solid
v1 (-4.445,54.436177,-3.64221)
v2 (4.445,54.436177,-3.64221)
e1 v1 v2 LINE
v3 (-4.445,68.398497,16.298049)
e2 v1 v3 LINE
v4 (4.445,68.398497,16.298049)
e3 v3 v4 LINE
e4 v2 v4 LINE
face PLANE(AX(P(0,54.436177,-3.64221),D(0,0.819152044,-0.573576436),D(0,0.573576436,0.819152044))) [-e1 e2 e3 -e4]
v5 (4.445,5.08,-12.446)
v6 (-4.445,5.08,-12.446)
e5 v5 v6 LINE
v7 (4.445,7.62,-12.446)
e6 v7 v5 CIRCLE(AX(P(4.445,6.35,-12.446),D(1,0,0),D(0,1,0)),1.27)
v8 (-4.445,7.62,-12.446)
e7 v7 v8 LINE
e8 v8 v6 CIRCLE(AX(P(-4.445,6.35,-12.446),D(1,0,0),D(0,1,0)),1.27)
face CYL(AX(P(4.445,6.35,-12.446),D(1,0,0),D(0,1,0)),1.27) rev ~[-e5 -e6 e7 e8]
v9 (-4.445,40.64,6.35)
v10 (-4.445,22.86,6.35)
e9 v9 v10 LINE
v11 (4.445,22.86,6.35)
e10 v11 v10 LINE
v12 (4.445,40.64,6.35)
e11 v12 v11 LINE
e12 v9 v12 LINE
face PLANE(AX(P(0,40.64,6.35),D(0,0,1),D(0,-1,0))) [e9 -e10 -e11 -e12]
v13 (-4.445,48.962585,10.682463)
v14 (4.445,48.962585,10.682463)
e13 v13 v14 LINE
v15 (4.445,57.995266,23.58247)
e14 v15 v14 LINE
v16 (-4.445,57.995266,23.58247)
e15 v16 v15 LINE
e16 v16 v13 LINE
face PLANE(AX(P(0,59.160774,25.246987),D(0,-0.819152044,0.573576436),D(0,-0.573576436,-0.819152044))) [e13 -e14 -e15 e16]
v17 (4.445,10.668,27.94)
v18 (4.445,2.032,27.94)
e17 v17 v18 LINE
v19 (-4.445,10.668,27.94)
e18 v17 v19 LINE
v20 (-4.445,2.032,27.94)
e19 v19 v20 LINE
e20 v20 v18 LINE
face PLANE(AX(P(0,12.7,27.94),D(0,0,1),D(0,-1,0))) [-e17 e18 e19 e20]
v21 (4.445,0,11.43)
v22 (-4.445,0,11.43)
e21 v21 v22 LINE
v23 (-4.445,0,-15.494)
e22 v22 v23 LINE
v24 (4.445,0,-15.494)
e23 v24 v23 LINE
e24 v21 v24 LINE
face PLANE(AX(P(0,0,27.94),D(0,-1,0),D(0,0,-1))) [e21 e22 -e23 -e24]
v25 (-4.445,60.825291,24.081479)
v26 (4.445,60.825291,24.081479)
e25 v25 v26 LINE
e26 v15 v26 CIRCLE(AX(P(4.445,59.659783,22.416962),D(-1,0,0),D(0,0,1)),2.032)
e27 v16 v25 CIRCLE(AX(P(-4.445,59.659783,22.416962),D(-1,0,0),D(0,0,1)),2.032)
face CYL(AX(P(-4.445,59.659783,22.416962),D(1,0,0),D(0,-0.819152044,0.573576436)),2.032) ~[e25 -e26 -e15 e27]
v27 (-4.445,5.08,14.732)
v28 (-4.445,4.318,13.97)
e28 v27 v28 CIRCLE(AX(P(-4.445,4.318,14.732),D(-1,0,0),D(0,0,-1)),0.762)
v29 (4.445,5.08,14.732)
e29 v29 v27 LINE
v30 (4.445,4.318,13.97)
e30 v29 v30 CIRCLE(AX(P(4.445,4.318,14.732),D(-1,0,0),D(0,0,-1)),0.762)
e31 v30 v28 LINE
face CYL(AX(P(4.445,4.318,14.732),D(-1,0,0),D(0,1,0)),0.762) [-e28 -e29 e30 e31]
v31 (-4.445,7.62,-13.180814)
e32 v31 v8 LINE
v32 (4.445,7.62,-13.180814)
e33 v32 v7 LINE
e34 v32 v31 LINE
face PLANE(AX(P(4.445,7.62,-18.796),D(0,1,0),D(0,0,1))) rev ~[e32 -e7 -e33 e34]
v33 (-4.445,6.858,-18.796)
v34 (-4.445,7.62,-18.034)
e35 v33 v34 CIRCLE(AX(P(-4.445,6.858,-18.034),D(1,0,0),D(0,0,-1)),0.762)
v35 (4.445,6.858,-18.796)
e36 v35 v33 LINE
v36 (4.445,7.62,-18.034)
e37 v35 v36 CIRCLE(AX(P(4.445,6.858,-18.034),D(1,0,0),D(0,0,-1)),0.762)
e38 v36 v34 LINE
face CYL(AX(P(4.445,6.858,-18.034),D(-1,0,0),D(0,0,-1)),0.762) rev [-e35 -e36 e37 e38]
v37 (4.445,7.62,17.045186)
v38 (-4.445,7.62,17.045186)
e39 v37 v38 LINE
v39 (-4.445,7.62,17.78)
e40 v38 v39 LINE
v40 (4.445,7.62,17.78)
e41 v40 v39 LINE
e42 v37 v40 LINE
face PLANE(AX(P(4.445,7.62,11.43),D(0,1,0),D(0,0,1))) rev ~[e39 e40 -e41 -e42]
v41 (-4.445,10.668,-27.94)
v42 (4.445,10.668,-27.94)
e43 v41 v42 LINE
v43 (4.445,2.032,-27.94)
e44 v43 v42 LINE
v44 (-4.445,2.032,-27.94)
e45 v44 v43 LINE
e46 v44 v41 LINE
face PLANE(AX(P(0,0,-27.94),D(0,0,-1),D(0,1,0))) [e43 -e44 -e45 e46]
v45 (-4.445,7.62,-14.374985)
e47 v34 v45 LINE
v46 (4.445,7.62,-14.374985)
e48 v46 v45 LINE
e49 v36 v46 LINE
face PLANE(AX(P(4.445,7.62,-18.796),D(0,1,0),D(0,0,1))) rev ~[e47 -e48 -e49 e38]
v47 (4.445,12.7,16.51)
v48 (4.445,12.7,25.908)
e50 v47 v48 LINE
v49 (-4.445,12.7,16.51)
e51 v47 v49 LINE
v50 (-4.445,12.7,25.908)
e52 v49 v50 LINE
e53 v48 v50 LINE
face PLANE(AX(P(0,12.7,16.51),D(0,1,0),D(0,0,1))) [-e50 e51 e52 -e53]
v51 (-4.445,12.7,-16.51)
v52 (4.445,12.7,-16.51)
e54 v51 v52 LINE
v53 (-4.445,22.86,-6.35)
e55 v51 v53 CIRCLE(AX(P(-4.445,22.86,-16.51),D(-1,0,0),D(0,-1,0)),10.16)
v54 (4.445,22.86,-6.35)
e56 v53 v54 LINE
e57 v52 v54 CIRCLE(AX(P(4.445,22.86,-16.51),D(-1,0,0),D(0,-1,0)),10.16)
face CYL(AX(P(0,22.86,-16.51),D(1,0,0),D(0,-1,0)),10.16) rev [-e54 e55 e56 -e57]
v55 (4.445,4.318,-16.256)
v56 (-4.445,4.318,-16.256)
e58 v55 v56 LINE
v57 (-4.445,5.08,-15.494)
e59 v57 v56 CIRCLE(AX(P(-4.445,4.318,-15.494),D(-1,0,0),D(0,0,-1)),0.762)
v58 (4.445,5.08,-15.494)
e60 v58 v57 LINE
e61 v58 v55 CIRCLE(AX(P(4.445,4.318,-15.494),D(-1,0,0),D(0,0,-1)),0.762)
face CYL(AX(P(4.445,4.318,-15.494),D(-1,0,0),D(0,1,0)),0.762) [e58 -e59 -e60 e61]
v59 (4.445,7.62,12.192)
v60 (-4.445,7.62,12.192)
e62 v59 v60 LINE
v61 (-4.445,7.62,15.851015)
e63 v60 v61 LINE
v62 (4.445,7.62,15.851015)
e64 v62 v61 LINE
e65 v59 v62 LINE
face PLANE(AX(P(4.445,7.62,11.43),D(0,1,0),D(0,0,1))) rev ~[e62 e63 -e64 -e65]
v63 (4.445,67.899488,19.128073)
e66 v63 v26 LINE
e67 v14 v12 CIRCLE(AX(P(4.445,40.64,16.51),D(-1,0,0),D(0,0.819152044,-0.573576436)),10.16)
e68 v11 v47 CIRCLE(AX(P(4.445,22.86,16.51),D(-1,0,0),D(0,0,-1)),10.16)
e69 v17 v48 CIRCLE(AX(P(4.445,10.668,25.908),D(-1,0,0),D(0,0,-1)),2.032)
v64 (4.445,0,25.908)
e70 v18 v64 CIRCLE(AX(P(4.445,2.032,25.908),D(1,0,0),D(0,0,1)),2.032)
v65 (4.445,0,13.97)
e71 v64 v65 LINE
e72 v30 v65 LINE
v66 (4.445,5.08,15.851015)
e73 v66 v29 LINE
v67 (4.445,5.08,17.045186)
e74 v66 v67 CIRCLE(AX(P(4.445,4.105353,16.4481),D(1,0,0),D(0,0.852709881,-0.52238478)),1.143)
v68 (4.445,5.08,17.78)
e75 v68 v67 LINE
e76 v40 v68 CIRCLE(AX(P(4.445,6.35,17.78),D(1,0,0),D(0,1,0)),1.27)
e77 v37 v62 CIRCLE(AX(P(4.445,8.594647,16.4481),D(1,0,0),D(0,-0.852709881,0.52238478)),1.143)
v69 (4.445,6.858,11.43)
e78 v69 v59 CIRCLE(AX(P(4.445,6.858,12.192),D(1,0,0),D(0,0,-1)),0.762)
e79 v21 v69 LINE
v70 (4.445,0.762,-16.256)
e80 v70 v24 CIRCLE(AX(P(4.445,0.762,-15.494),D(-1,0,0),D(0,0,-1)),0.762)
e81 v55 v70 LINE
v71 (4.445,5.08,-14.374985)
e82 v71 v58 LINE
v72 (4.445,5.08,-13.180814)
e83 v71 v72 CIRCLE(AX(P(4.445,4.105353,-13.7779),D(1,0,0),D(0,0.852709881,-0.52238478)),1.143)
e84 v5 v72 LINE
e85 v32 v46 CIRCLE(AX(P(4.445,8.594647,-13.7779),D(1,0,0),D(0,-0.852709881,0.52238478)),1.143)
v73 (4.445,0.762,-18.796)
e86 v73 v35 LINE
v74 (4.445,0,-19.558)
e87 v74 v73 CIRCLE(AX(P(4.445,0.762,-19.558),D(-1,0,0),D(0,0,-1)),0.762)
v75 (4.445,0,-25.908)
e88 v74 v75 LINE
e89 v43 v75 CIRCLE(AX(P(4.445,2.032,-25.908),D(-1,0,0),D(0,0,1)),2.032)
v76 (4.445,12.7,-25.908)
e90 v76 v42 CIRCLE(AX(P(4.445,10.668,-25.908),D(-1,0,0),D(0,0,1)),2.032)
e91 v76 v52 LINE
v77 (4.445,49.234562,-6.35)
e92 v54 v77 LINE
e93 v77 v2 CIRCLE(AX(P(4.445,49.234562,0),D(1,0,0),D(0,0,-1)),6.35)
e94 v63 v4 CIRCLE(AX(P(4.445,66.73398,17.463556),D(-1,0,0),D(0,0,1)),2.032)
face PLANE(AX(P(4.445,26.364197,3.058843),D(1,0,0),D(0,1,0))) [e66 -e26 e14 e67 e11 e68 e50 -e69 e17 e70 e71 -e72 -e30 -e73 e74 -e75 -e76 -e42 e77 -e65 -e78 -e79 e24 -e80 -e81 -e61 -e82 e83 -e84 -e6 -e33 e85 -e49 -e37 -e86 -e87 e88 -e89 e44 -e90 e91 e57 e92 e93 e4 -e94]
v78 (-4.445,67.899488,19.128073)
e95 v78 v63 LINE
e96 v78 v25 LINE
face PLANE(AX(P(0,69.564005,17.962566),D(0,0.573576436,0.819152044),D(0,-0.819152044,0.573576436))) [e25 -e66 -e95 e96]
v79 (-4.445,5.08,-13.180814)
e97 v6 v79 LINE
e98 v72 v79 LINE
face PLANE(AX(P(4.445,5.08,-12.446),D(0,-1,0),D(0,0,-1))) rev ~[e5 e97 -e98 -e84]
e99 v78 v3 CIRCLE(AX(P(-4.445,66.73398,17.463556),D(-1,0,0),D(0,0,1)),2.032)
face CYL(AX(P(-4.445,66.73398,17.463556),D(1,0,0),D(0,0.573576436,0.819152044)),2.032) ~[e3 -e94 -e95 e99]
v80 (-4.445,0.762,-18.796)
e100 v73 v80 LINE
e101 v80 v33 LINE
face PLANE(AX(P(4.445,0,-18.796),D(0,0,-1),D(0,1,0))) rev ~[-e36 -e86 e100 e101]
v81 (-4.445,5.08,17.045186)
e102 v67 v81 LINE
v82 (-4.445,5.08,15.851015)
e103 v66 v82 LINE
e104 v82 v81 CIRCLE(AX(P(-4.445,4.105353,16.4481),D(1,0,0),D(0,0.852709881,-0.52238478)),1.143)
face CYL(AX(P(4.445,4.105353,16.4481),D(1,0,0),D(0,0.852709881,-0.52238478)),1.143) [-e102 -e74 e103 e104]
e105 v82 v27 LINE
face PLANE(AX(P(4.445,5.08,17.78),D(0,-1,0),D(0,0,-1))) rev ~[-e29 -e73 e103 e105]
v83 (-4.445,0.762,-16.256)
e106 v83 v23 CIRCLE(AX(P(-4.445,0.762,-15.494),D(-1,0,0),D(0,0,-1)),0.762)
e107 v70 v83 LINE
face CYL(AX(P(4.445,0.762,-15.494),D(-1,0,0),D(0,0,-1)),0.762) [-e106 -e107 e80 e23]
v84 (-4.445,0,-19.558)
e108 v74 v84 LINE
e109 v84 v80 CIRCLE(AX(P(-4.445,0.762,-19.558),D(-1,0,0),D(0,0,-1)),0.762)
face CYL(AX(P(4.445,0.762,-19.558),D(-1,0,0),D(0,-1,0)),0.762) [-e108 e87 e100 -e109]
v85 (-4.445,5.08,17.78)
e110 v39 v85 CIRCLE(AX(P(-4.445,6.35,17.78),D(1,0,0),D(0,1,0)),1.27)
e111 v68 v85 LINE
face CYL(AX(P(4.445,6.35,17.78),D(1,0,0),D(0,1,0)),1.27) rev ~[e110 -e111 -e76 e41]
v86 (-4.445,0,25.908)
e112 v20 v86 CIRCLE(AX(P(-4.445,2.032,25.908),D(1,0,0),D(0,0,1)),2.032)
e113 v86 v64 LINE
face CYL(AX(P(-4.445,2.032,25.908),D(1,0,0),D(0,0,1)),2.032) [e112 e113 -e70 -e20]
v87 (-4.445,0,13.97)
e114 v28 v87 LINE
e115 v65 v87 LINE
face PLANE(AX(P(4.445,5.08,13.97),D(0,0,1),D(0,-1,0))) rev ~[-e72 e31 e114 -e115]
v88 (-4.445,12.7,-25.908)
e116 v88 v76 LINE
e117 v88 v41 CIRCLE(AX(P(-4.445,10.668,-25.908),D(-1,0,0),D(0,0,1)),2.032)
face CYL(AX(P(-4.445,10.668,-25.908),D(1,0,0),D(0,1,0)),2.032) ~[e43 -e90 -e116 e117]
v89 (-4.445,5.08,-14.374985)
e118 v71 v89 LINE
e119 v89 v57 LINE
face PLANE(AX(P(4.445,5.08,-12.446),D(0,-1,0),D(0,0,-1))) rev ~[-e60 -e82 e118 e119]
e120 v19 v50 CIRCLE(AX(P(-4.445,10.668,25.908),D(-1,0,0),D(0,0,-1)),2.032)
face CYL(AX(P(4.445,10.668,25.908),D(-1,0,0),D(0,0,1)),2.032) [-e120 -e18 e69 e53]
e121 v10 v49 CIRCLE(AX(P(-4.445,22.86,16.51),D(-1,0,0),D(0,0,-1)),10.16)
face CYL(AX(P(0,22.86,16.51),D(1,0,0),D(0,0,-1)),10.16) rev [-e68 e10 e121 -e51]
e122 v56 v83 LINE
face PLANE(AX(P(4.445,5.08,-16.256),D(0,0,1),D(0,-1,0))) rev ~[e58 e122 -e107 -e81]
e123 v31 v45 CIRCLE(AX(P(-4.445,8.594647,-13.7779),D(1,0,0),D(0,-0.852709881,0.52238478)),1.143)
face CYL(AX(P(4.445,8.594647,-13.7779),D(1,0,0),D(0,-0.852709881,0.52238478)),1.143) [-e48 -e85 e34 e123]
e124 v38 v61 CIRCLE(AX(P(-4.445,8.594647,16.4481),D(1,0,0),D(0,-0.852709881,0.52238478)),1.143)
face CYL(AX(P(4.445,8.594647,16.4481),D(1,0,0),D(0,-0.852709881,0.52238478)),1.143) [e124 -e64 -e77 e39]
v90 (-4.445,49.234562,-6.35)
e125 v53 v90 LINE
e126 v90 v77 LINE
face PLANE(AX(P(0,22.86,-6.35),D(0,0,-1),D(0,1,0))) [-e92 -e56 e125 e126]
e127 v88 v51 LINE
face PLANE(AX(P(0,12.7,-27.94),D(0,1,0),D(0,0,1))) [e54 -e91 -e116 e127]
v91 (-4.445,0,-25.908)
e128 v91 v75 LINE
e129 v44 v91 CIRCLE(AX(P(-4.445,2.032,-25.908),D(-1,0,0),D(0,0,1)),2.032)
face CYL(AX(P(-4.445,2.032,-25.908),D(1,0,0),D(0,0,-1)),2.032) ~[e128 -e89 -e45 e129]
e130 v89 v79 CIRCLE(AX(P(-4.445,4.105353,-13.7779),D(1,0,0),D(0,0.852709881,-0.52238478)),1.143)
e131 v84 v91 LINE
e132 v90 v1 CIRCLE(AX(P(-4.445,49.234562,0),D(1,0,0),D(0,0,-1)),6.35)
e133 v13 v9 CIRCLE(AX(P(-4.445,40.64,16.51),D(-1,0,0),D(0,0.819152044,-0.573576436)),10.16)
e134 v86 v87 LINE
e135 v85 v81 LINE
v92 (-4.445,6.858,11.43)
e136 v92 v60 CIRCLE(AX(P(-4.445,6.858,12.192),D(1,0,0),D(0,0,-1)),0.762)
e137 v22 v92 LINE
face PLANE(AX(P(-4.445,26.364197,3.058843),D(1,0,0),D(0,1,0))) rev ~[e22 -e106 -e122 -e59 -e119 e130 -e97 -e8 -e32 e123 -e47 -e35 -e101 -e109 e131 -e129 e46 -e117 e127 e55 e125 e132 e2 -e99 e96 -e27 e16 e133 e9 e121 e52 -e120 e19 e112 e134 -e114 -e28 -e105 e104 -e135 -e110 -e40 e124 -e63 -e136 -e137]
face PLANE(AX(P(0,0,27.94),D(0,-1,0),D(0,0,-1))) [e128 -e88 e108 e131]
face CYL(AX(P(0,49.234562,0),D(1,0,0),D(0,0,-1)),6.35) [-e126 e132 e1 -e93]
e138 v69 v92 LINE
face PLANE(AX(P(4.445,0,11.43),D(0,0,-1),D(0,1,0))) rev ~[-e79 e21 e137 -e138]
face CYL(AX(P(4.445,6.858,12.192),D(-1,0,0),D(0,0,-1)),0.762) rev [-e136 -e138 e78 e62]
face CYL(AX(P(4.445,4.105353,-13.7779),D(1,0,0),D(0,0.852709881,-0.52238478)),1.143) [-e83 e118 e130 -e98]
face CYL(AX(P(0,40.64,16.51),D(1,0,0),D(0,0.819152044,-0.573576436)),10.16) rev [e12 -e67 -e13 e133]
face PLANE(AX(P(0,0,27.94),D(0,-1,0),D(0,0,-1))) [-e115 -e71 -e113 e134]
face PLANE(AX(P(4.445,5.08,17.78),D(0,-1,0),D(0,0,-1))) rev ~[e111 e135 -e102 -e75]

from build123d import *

# Parameters (mm, degrees)
F1_DEPTH = 4.445
F2_R     = 2.032
F4_DEPTH = 8.891
F5_R     = 0.762
F7_DEPTH = 8.89


# Not quite as in the source:
# - a feature names something its author has since deleted; it is built from what else it names


with BuildPart() as f1:
    # F0 (on Right) → F1 (new body, symmetric)
    with BuildSketch(Plane.YZ):
        with BuildLine():
            Line((12.7, 27.94), (0, 27.94))
            Line((0, 27.94), (0, -27.94))
            Line((0, -27.94), (12.7, -27.94))
            Line((12.7, -27.94), (12.7, -16.51))
            ThreePointArc((12.7, -16.51), (15.6757951031, -9.3257951031), (22.86, -6.35))
            Line((22.86, -6.35), (49.2345620046, -6.35))
            ThreePointArc((49.2345620046, -6.35), (52.1666656987, -5.6325187907), (54.4361774858, -3.6422103708))
            Line((54.4361774858, -3.6422103708), (69.5640047708, 17.9625660125))
            Line((69.5640047708, 17.9625660125), (59.1607738083, 25.2469867541))
            Line((59.1607738083, 25.2469867541), (48.96258477, 10.6824634067))
            ThreePointArc((48.96258477, 10.6824634067), (45.3313659105, 7.4979699349), (40.64, 6.35))
            Line((40.64, 6.35), (22.86, 6.35))
            ThreePointArc((22.86, 6.35), (15.6757951031, 9.3257951031), (12.7, 16.51))
            Line((12.7, 16.51), (12.7, 27.94))
        make_face()
    extrude(amount=F1_DEPTH, both=True)

    # F2
    f2_edges = [f1.edges().sort_by_distance(p)[0] for p in [
        (0, 12.7, 27.94),
        (0, 59.160774, 25.246987),
        (0, 69.564005, 17.962566),
        (0, 12.7, -27.94),
        (0, 0, -27.94),
        (0, 0, 27.94),
    ]]
    fillet(f2_edges, radius=F2_R)

    # F3 (on face) → F4 (cut, through all)
    with BuildSketch(Plane.YZ.offset(4.445)):
        with BuildLine():
            Line((7.62, 11.43), (7.62, 17.78))
            ThreePointArc((7.62, 17.78), (6.35, 19.05), (5.08, 17.78))
            Line((5.08, 17.78), (5.08, 13.97))
            Line((5.08, 13.97), (0, 13.97))
            Line((0, 13.97), (0, 11.43))
            Line((0, 11.43), (7.62, 11.43))
        make_face()
        with BuildLine():
            Line((7.62, -18.796), (7.62, -12.446))
            ThreePointArc((7.62, -12.446), (6.35, -11.176), (5.08, -12.446))
            Line((5.08, -12.446), (5.08, -16.256))
            Line((5.08, -16.256), (0, -16.256))
            Line((0, -16.256), (0, -18.796))
            Line((0, -18.796), (7.62, -18.796))
        make_face()
    extrude(amount=-F4_DEPTH, mode=Mode.SUBTRACT)

    # F5
    f5_edges = [f1.edges().sort_by_distance(p)[0] for p in [
        (0, 7.62, 11.43),
        (0, 0, -16.256),
        (0, 7.62, -18.796),
        (0, 0, -18.796),
        (0, 5.08, -16.256),
        (0, 5.08, 13.97),
    ]]
    fillet(f5_edges, radius=F5_R)

    # F6 (on face) → F7 (join, through all)
    with BuildSketch(Plane.YZ.offset(4.445)):
        with BuildLine():
            Line((5.08, 17.0451861632), (5.08, 15.8510145557))
            ThreePointArc((5.08, 15.8510145557), (5.2483526058, 16.4481003594), (5.08, 17.0451861632))
        make_face()
        with BuildLine():
            Line((5.08, -13.1808138368), (5.08, -14.3749854443))
            ThreePointArc((5.08, -14.3749854443), (5.2483526058, -13.7778996406), (5.08, -13.1808138368))
        make_face()
        with BuildLine():
            Line((7.62, -14.3749854443), (7.62, -13.1808138368))
            ThreePointArc((7.62, -13.1808138368), (7.4516473942, -13.7778996406), (7.62, -14.3749854443))
        make_face()
        with BuildLine():
            Line((7.62, 15.8510145557), (7.62, 17.0451861632))
            ThreePointArc((7.62, 17.0451861632), (7.4516473942, 16.4481003594), (7.62, 15.8510145557))
        make_face()
    extrude(amount=-F7_DEPTH)


solid = f1.part
